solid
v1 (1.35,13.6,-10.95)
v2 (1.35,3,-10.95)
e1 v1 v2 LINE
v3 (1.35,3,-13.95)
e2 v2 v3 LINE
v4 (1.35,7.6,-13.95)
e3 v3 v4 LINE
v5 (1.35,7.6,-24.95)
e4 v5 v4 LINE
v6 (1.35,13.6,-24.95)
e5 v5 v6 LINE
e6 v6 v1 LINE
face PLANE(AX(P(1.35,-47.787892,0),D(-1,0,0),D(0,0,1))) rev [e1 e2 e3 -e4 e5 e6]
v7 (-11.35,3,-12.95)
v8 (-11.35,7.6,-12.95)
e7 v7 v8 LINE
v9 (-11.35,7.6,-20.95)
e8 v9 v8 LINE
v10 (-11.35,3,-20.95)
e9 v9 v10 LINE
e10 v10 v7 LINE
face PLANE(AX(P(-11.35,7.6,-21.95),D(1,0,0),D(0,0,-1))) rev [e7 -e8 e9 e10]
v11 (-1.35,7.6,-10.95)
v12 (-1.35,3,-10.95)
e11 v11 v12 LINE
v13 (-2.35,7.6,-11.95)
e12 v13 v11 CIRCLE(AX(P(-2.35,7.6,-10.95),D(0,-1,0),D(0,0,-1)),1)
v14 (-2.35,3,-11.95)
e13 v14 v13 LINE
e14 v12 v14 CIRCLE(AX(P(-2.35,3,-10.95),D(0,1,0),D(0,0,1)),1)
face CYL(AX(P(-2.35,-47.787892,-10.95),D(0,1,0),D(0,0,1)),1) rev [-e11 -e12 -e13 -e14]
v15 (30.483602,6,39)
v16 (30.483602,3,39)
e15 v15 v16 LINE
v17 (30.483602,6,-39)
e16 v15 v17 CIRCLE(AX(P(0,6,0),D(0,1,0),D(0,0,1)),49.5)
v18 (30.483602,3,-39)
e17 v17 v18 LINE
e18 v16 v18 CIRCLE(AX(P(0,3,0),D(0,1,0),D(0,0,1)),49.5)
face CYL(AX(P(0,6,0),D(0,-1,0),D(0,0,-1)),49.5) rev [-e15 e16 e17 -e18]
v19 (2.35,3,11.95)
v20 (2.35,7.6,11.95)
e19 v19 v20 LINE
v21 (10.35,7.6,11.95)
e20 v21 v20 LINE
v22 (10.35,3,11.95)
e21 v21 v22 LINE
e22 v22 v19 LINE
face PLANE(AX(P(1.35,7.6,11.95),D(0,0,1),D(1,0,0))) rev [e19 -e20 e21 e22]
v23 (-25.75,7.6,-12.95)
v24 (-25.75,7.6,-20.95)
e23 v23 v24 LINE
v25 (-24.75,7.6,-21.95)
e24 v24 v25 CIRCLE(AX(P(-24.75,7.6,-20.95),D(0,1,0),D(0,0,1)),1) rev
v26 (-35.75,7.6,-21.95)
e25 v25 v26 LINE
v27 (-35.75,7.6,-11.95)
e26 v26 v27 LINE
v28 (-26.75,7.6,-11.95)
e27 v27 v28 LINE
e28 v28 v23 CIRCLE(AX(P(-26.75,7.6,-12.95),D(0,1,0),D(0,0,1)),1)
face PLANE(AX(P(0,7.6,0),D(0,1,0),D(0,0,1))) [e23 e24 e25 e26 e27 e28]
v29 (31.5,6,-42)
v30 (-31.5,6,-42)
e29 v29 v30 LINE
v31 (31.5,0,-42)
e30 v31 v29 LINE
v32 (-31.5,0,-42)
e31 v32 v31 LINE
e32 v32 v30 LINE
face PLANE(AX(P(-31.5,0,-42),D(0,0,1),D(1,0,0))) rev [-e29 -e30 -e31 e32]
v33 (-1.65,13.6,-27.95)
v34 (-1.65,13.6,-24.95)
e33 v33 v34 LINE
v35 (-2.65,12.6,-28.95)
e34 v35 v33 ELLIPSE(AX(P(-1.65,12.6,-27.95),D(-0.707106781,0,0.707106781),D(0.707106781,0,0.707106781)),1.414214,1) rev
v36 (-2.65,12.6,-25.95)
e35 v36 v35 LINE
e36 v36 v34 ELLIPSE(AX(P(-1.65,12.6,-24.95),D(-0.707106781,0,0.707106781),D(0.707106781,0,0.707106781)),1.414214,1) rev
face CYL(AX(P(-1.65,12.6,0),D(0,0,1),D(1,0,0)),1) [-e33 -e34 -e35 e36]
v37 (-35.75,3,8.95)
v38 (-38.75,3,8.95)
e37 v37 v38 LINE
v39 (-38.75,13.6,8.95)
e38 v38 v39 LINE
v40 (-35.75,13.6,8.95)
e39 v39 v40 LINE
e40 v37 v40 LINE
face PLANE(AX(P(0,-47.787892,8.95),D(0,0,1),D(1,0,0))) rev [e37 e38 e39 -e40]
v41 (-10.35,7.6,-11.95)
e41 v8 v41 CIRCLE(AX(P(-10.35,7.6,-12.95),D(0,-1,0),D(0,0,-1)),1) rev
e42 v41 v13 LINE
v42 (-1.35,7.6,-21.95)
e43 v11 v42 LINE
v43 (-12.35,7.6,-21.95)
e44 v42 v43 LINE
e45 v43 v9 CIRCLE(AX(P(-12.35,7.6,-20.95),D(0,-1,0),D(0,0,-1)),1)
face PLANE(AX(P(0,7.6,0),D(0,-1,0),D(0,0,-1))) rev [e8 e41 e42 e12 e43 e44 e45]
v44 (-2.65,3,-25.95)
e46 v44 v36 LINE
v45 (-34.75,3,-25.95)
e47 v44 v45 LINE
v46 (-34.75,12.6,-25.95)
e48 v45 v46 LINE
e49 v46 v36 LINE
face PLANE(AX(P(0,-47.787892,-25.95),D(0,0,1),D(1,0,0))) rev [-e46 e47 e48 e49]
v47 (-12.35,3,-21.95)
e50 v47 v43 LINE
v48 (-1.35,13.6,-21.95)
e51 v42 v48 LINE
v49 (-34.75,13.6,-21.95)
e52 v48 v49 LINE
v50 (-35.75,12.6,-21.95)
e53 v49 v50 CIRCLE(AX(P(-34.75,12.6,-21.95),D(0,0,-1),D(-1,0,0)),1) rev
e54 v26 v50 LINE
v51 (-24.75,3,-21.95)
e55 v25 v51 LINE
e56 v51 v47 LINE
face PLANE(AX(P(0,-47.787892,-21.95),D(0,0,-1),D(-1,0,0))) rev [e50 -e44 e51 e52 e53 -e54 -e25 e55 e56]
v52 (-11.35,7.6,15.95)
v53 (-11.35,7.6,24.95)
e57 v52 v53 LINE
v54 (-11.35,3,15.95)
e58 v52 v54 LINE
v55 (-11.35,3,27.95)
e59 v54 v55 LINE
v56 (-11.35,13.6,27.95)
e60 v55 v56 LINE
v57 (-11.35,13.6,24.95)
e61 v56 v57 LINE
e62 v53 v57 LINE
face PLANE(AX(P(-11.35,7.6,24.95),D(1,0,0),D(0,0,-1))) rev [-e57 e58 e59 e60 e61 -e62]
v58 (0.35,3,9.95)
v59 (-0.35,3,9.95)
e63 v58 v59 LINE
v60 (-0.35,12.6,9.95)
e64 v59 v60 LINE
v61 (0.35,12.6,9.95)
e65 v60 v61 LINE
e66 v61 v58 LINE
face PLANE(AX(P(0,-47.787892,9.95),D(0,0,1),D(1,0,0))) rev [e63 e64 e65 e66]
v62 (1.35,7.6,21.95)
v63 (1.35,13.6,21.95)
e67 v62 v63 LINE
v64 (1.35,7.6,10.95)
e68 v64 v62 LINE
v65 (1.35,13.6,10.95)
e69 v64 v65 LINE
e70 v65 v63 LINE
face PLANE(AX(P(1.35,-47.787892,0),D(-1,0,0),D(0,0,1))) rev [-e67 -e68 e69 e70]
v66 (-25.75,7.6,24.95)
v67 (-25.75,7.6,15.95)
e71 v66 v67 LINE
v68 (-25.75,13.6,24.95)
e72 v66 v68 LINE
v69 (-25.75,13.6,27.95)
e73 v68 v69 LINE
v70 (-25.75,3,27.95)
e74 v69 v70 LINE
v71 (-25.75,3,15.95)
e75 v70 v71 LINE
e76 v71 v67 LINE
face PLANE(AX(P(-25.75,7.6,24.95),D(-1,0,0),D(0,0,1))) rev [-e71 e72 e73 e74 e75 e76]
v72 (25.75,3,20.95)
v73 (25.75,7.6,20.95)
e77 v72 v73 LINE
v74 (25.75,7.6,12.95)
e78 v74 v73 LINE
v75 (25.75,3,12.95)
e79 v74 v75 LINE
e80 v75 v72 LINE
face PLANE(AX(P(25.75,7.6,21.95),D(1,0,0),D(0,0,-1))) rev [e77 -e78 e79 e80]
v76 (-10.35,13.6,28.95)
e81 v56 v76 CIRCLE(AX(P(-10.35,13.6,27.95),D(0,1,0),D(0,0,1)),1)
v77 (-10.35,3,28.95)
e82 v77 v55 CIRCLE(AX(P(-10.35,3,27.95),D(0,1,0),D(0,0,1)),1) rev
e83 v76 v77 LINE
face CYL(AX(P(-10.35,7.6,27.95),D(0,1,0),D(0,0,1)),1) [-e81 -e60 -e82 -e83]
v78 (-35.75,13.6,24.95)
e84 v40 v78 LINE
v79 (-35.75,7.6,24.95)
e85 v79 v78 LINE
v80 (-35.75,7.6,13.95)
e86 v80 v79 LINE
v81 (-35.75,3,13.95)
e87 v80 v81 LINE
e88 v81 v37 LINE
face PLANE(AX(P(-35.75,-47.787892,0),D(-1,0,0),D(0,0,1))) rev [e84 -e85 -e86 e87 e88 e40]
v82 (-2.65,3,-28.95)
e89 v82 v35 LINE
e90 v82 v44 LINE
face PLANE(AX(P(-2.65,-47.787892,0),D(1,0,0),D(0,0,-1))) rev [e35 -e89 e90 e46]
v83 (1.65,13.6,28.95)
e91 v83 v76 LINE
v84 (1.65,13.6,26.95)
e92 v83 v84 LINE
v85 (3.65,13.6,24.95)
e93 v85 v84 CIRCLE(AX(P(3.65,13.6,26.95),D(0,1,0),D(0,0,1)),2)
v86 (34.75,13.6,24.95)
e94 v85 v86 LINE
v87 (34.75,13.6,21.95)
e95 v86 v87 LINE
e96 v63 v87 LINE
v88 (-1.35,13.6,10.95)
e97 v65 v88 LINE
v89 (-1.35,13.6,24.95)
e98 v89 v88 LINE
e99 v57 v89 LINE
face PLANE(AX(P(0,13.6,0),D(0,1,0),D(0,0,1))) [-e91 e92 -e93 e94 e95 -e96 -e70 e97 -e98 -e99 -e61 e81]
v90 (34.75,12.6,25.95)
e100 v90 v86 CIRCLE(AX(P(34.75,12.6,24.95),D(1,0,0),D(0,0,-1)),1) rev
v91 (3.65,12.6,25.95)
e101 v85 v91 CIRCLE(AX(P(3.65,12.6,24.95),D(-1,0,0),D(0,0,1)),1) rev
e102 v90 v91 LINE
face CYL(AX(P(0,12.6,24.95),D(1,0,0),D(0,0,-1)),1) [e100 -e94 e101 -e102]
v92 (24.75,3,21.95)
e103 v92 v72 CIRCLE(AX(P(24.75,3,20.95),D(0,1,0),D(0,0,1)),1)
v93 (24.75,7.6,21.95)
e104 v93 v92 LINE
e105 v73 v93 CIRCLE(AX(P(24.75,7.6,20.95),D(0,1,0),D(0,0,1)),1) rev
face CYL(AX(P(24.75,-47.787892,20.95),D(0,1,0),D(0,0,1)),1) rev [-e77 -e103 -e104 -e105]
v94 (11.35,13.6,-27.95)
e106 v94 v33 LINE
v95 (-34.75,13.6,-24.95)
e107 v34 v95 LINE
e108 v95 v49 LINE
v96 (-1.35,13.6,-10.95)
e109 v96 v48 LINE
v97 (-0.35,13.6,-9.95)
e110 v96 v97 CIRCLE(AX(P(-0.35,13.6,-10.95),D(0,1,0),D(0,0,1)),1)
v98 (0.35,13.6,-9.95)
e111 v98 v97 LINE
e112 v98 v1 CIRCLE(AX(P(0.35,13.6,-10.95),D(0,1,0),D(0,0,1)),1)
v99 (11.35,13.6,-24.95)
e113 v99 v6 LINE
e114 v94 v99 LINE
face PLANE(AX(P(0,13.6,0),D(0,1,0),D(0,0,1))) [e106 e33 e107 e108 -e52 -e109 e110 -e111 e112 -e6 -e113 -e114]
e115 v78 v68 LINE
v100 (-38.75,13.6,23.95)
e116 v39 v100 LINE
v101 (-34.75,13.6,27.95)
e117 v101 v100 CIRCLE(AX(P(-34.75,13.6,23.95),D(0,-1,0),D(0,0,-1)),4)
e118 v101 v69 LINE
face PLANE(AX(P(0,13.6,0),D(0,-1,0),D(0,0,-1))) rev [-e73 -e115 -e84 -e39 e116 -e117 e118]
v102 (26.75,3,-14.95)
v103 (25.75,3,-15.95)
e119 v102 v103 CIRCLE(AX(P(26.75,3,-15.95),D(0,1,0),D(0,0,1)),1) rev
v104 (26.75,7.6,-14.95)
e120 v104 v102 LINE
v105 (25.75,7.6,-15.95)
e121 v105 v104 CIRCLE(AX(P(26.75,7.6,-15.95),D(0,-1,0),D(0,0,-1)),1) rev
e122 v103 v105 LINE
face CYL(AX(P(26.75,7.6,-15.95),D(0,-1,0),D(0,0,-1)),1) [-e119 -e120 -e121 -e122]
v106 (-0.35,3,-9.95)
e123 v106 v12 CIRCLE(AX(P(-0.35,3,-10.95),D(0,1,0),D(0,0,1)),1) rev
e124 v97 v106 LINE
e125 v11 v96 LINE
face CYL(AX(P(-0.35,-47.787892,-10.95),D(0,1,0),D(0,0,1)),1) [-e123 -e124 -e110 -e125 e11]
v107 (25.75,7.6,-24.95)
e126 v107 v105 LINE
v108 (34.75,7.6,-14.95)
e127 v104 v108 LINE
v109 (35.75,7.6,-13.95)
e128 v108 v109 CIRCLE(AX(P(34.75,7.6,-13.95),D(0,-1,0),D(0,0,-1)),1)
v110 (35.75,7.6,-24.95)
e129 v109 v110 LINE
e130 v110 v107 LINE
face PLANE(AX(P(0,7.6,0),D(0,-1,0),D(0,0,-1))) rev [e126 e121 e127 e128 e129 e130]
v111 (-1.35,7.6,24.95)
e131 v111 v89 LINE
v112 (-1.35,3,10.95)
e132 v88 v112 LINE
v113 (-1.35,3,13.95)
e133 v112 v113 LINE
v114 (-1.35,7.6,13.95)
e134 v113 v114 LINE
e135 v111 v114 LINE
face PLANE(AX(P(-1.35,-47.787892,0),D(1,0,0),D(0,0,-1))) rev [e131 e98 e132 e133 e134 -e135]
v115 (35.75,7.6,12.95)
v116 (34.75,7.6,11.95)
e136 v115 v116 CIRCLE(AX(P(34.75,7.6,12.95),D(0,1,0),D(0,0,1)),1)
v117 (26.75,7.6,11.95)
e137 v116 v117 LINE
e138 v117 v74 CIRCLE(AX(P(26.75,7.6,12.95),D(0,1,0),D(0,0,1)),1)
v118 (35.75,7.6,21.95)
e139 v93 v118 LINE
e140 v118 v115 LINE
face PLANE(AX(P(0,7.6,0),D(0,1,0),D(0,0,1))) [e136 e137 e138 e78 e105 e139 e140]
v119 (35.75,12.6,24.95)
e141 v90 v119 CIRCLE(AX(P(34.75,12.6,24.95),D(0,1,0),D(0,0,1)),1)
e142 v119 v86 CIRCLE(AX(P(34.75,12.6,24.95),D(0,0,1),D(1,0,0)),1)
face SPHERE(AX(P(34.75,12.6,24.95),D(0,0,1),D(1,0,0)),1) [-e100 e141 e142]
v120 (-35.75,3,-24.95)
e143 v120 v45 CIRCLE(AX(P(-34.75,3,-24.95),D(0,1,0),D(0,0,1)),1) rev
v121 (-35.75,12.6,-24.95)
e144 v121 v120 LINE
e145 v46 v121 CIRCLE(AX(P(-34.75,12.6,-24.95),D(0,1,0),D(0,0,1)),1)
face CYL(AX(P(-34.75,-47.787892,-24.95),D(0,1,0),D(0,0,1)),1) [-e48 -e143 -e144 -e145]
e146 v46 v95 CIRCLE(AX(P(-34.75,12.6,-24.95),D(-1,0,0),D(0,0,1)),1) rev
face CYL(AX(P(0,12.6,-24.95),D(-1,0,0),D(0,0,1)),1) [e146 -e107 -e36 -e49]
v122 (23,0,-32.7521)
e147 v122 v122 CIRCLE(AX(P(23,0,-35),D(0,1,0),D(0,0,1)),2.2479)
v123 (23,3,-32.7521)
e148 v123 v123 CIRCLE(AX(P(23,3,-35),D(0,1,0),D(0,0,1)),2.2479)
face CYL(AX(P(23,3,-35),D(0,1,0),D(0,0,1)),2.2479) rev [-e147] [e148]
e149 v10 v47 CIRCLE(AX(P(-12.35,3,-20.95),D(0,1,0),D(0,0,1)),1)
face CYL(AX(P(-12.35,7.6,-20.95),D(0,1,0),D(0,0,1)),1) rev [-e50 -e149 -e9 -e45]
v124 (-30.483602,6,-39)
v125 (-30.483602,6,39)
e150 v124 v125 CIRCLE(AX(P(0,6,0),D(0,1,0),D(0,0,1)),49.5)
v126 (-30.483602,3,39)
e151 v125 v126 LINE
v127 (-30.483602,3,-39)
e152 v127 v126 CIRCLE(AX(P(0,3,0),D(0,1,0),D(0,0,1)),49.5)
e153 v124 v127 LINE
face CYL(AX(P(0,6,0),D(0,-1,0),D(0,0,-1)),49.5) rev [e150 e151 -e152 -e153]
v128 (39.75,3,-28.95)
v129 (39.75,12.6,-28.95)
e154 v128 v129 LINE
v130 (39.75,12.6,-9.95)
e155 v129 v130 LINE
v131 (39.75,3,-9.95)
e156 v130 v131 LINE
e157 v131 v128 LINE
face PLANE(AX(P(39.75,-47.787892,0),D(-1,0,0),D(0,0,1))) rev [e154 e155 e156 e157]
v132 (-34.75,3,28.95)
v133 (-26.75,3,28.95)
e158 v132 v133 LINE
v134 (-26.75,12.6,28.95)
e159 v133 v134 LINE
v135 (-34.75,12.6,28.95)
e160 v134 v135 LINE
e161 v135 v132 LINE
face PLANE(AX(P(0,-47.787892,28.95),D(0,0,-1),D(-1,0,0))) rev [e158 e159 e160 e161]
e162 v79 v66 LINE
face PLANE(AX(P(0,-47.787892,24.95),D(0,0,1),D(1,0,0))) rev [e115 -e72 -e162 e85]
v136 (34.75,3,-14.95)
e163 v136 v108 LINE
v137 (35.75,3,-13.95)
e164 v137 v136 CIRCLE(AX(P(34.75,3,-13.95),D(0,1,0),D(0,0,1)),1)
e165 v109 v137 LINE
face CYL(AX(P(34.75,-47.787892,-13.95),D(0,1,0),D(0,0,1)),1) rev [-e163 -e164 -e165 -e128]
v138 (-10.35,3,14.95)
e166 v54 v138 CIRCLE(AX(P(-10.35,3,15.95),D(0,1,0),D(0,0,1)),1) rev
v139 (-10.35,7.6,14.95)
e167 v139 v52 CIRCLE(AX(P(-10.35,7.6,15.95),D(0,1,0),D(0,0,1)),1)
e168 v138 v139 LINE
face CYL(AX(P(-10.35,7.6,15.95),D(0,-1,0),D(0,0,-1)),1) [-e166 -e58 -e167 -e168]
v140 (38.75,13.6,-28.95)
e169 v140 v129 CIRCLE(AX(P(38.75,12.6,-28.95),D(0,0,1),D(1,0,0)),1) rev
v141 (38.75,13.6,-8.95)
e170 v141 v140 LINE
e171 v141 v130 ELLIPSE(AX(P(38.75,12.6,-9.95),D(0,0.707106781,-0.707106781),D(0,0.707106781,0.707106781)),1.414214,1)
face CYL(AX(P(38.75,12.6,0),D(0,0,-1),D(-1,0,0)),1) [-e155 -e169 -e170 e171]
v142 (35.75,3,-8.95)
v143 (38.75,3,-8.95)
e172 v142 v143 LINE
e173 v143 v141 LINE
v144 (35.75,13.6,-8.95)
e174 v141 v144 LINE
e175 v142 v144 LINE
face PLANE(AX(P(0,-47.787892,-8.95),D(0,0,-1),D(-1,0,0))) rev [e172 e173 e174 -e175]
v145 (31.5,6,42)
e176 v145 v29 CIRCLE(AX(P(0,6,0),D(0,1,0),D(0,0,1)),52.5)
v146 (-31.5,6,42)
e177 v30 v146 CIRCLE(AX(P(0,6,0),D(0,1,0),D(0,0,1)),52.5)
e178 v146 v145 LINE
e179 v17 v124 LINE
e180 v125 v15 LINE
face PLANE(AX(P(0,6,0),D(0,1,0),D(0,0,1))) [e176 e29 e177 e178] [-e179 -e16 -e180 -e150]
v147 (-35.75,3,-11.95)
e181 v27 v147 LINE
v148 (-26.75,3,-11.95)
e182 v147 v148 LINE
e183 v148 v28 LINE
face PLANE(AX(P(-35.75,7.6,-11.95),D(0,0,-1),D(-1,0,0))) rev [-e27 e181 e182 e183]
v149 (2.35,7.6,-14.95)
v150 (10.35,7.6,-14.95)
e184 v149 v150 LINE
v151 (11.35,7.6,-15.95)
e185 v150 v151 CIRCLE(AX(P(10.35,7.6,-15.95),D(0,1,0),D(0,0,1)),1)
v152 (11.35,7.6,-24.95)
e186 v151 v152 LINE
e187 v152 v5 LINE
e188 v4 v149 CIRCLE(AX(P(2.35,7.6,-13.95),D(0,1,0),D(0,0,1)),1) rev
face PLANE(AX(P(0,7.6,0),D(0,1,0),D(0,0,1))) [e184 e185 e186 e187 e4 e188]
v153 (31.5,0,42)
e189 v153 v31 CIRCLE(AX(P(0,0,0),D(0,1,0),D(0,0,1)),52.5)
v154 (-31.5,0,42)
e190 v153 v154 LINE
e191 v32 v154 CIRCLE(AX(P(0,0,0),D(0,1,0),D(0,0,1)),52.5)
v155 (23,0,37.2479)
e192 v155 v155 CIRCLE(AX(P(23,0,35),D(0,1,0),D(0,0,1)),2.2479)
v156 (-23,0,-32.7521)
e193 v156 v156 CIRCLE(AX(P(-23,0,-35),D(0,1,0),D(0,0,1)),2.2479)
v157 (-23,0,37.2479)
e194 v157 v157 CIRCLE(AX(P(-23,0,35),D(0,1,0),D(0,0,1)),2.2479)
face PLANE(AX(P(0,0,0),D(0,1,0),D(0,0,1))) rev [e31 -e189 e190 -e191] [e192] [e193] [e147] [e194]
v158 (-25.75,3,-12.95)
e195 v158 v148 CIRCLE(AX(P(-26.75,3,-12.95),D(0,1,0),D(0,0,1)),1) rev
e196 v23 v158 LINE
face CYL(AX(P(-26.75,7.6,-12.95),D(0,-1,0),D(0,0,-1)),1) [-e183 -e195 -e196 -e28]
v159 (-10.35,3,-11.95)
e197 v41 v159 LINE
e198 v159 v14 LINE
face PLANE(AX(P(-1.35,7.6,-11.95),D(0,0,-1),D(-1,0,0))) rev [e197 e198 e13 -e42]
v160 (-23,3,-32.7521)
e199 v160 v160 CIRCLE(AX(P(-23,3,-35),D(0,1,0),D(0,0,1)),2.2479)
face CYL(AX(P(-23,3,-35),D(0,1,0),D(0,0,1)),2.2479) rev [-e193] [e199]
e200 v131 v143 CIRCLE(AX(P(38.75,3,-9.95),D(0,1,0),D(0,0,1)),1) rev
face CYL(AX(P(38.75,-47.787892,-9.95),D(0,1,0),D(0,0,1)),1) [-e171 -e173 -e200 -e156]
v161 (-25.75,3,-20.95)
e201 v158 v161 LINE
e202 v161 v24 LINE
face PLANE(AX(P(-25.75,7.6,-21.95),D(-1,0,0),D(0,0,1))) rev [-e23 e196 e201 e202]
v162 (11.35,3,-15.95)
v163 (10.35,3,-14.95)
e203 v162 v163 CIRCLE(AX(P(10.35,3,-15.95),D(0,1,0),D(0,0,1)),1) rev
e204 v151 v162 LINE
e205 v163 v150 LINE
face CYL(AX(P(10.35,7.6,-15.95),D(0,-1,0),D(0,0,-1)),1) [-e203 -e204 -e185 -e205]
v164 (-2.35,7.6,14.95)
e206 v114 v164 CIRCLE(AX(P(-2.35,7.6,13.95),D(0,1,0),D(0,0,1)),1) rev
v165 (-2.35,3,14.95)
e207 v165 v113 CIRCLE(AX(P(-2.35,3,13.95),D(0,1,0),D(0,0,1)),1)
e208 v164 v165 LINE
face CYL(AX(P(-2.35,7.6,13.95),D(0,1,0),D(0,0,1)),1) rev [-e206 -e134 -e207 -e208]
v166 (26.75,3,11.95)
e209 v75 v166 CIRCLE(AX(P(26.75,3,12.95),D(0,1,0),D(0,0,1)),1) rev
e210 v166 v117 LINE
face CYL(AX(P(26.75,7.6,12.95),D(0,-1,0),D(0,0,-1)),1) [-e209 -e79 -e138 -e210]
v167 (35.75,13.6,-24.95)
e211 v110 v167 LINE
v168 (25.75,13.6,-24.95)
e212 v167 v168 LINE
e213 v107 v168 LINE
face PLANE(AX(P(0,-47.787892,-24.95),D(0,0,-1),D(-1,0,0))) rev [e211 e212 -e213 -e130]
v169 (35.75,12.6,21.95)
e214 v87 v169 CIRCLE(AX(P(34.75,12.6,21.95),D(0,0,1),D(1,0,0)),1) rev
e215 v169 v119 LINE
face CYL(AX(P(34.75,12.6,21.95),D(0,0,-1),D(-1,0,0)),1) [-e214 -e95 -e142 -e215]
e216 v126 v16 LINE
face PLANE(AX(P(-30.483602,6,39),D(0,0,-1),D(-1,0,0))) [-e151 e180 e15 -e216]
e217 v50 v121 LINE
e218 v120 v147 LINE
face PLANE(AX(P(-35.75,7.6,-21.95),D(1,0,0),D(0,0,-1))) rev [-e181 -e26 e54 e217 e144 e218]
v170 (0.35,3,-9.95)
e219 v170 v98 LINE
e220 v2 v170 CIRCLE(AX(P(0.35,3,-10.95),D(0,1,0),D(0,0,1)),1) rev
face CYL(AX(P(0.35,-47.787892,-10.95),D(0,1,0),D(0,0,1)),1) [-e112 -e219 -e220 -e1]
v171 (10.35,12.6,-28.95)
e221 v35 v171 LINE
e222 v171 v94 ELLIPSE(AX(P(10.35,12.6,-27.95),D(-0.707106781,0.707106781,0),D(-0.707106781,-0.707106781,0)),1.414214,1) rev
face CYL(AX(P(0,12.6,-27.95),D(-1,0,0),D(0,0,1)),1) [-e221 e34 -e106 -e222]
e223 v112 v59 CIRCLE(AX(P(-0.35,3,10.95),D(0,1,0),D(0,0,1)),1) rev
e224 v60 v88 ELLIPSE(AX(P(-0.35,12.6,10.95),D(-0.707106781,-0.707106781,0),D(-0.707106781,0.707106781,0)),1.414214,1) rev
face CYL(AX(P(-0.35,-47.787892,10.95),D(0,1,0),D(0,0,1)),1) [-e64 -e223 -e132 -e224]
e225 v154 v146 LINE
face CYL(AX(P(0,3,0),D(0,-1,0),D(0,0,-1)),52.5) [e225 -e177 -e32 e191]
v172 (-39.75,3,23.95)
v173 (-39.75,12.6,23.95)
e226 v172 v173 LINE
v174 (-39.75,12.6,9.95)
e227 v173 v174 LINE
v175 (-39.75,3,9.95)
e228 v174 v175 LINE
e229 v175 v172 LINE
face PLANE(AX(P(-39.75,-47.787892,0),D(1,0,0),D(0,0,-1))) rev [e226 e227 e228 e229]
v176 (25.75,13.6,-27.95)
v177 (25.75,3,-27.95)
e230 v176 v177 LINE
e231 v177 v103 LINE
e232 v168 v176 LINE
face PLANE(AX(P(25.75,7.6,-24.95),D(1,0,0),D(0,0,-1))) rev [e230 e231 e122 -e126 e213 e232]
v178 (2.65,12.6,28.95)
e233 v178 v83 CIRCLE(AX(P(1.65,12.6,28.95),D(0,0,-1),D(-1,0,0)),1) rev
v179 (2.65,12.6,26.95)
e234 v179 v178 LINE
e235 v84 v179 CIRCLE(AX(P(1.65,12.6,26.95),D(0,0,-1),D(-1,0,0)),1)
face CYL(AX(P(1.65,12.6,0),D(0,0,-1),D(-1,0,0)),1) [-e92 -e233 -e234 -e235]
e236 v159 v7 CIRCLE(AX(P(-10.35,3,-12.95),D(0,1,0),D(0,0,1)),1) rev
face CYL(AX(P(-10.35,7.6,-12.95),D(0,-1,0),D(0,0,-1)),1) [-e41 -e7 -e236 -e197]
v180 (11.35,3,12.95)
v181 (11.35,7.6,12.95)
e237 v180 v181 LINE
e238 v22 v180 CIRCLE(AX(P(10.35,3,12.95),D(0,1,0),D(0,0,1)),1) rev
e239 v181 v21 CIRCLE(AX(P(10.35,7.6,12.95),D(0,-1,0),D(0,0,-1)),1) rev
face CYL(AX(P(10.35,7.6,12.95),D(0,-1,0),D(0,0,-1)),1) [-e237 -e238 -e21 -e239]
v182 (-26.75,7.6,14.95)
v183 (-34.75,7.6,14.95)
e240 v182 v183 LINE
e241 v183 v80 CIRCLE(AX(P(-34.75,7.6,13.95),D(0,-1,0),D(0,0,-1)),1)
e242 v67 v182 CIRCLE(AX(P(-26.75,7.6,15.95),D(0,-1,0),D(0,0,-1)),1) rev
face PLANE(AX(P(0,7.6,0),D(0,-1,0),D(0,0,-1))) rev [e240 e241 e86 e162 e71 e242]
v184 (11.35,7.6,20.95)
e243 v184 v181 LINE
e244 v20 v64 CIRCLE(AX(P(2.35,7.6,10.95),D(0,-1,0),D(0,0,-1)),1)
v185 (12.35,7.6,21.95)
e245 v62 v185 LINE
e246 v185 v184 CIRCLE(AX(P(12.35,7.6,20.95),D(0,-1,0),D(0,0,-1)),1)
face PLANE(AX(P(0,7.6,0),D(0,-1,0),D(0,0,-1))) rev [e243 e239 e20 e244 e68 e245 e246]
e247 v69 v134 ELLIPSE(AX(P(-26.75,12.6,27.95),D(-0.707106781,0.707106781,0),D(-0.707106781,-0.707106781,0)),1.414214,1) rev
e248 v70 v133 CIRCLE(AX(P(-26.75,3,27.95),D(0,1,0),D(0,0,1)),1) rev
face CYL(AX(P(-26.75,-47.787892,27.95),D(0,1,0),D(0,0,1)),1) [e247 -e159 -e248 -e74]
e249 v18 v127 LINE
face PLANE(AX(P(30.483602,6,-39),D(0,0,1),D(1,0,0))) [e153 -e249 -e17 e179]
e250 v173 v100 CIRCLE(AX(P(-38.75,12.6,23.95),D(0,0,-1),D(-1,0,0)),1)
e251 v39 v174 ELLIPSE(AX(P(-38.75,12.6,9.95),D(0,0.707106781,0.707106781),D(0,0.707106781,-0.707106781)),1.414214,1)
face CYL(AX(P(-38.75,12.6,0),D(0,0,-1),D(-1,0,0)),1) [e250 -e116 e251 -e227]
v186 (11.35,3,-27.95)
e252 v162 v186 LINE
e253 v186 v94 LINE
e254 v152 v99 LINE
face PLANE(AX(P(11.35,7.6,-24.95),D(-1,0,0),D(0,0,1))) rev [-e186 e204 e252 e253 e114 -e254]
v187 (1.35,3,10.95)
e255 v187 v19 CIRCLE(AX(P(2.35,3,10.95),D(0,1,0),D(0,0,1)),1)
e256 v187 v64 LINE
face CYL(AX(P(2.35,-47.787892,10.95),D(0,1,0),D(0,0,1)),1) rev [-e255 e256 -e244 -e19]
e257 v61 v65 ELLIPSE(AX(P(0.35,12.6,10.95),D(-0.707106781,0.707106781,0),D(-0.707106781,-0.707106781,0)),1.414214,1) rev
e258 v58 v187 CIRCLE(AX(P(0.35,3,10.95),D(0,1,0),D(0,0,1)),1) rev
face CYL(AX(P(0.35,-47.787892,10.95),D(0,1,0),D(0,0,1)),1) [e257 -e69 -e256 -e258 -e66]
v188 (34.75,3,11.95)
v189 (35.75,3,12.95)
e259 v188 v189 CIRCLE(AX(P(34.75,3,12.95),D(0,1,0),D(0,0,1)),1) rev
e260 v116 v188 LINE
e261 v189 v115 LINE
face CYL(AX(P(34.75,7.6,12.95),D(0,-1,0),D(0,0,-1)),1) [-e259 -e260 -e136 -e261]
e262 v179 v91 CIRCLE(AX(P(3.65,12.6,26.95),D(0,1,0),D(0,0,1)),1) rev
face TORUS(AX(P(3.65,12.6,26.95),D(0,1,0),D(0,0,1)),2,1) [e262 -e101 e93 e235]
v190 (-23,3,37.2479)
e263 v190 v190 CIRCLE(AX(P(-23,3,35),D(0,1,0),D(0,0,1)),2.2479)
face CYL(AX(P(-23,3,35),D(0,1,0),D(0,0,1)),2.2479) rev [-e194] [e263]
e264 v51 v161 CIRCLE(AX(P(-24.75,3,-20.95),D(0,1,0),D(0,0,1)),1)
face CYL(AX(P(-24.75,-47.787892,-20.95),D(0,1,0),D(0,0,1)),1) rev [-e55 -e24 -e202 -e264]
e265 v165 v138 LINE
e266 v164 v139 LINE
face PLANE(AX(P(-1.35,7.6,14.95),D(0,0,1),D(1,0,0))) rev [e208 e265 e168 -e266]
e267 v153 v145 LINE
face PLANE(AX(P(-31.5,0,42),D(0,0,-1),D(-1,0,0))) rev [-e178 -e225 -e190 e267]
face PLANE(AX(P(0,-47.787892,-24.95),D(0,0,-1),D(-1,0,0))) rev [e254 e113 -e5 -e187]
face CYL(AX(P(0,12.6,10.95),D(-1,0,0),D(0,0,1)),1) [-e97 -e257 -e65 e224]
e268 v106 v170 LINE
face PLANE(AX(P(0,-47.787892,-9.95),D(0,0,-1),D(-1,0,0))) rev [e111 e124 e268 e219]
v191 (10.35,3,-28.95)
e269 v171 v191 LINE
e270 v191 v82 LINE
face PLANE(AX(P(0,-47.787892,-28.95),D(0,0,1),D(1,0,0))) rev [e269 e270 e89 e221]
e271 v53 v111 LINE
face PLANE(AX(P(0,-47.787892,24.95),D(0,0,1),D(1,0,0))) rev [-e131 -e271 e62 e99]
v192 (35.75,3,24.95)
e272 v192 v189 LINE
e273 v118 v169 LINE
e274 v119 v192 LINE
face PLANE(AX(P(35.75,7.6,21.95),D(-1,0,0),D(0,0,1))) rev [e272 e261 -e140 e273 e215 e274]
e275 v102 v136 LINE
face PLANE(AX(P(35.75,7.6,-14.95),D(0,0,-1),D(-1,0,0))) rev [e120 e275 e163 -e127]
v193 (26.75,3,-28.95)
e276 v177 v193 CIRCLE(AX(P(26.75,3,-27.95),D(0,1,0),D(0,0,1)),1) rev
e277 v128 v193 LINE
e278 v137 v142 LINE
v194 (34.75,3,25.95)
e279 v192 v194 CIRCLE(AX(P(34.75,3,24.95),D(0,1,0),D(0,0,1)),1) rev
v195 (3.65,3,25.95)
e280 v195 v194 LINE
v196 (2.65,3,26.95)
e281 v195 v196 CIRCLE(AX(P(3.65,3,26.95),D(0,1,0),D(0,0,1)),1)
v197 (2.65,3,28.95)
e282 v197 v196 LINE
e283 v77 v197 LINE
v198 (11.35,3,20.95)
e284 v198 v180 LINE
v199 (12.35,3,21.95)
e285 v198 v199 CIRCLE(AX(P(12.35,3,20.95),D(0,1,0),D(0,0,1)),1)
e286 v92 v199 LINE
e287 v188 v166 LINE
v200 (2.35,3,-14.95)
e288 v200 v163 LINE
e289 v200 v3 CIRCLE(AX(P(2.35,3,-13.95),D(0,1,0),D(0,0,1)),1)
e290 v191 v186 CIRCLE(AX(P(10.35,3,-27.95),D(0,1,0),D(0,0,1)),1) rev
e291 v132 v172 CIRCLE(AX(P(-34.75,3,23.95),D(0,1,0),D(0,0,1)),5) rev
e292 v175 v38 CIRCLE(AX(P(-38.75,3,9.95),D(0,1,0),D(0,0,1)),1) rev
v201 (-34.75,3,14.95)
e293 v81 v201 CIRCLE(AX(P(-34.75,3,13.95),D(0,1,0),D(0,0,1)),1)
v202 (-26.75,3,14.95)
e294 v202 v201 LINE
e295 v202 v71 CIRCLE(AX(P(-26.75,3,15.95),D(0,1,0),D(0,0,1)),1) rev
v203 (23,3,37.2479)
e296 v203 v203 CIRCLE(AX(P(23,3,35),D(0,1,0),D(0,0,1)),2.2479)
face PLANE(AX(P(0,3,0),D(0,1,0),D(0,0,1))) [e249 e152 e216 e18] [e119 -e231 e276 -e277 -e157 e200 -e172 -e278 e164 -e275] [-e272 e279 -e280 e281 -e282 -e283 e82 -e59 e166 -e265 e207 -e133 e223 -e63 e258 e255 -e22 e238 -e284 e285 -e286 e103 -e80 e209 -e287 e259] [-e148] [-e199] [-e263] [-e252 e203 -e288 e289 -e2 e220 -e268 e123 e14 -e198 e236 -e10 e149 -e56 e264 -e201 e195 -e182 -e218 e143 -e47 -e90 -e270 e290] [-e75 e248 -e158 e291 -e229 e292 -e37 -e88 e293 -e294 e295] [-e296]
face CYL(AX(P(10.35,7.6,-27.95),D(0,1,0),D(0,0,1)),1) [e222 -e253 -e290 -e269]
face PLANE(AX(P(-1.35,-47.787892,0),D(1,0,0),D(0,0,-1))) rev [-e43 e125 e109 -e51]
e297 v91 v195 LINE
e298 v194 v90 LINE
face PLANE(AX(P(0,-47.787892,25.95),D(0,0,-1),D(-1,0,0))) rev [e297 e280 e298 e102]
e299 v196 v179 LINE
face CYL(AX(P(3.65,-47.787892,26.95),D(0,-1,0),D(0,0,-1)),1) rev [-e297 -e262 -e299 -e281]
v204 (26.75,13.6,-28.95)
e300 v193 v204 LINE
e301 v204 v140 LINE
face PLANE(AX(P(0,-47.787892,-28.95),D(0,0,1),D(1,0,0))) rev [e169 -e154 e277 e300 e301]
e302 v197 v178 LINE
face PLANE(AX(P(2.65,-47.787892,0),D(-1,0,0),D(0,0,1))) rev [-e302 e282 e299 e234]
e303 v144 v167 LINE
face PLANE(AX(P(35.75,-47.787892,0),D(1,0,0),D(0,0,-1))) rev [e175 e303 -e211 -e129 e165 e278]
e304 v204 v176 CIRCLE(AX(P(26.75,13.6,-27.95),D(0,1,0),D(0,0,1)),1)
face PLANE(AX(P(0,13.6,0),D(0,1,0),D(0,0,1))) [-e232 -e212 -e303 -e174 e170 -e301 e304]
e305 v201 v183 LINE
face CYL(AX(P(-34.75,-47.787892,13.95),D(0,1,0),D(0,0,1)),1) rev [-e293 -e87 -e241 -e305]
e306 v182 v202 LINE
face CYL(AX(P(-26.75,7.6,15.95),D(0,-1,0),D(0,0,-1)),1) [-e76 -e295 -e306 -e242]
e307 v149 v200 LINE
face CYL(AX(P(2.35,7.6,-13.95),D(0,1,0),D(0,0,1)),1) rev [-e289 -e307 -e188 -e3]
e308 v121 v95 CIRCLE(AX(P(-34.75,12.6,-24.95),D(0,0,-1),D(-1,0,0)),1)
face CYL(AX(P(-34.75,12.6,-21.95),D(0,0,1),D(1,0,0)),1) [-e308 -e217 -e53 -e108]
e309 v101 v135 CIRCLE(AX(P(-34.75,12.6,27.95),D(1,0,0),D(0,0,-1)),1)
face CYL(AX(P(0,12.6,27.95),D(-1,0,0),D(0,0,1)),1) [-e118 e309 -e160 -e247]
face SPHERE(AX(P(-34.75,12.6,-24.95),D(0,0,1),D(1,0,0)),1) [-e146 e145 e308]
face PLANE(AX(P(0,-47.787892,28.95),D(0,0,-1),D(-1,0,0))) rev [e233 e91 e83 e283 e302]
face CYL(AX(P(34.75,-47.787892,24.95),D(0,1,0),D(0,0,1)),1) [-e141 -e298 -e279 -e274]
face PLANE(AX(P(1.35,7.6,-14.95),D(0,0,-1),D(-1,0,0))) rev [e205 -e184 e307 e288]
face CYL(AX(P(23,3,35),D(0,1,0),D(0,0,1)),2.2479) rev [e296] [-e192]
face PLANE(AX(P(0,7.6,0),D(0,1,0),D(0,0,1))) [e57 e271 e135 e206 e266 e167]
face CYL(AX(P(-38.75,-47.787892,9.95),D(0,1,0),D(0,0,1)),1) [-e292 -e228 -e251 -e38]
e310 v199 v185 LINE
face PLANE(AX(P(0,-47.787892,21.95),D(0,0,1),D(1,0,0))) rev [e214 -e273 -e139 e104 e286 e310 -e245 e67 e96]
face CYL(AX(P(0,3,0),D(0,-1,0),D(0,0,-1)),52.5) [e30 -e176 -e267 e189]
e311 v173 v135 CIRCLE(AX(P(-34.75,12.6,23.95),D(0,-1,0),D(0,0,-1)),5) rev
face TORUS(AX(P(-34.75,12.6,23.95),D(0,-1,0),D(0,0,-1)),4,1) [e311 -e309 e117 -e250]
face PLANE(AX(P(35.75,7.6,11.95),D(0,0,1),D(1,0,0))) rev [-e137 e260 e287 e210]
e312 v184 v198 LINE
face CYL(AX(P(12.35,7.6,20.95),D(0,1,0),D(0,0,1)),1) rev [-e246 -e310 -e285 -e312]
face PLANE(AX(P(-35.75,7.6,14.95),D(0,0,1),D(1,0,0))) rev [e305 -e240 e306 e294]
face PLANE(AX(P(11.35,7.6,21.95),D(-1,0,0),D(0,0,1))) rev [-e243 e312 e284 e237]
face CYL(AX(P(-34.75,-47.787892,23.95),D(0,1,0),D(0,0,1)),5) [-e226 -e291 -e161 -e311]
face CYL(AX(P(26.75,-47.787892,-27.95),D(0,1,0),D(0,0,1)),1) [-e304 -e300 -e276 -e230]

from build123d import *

# Parameters (mm, degrees)
A_BASE_T42_OUTLINE_R       = 2.2479
A_BASE_T42_OUTLINE_R_2     = 1
A_BASE_T42_DEPTH           = 3
OUTER_BRIM_DEPTH           = 3
SKETCH5_W                  = 15
SKETCH5_H                  = 3
BASE_SUPPORTS_DEPTH        = 3
BASE_SUPPORTS_CHAMFER_SIZE = 3
COVER_START                = -3
SKETCH6_R                  = 1
COVER_DEPTH                = 3
SKETCH9_W                  = 15
SKETCH9_H                  = 6
CUT_EXTRUDE1_DEPTH         = 10
SKETCH11_W                 = 10
SKETCH11_H                 = 10
BOSS_EXTRUDE1_DEPTH        = 4.6
BOSS_EXTRUDE2_DEPTH        = 10.6
FILLET1_R                  = 1
FILLET2_R                  = 5


# Read off the part's stored shape, not the designer's step: a_base_t42
# Some blends are built 0.0001 mm under size
with BuildPart() as part:
    # a_base_t42 outline → a_base_t42 (new body)
    with BuildSketch(Plane(origin=(0, 0, 0), x_dir=(1, 0, 0), z_dir=(0, 1, 0))):
        with BuildLine():
            ThreePointArc((31.5, -42), (52.5, 0), (31.5, 42))
            Line((31.5, 42), (-31.5, 42))
            ThreePointArc((-31.5, 42), (-52.5, 0), (-31.5, -42))
            Line((-31.5, -42), (31.5, -42))
        make_face()
        with Locations((-23, -35)):
            Circle(A_BASE_T42_OUTLINE_R, mode=Mode.SUBTRACT)
        with Locations((23, -35)):
            Circle(A_BASE_T42_OUTLINE_R, mode=Mode.SUBTRACT)
        with Locations((-40.25, 0)):
            Circle(A_BASE_T42_OUTLINE_R_2, mode=Mode.SUBTRACT)
        with Locations((-23, 35)):
            Circle(A_BASE_T42_OUTLINE_R, mode=Mode.SUBTRACT)
        with Locations((40.25, 0)):
            Circle(A_BASE_T42_OUTLINE_R_2, mode=Mode.SUBTRACT)
        with Locations((23, 35)):
            Circle(A_BASE_T42_OUTLINE_R, mode=Mode.SUBTRACT)
    extrude(amount=A_BASE_T42_DEPTH)

    # Sketch1 → Outer Brim (add)
    with BuildSketch(Plane(origin=(0, 3, 0), x_dir=(1, 0, 0), z_dir=(0, 1, 0))):
        with BuildLine():
            Line((-31.5, -42), (31.5, -42))
            ThreePointArc((31.5, -42), (52.5, 0), (31.5, 42))
            Line((31.5, 42), (-31.5, 42))
            ThreePointArc((-31.5, 42), (-52.5, 0), (-31.5, -42))
        make_face()
        with BuildLine():
            Line((30.483602149, 39), (-30.483602149, 39))
            ThreePointArc((-30.483602149, 39), (-49.5, 0), (-30.483602149, -39))
            Line((-30.483602149, -39), (30.483602149, -39))
            ThreePointArc((30.483602149, -39), (49.5, 0), (30.483602149, 39))
        make_face(mode=Mode.SUBTRACT)
    extrude(amount=OUTER_BRIM_DEPTH)

    # Sketch5 → Base Supports (add)
    with BuildSketch(Plane(origin=(0, 3, 0), x_dir=(1, 0, 0), z_dir=(0, 1, 0))):
        with Locations((0, -27)):
            Rectangle(SKETCH5_W, SKETCH5_H)
        with Locations((0, 27)):
            Rectangle(SKETCH5_W, SKETCH5_H)
    extrude(amount=BASE_SUPPORTS_DEPTH)

    # Base Supports Chamfer
    base_supports_chamfer_edges = [part.edges().sort_by_distance(p)[0] for p in [
        (0, 3, 28.5),
        (0, 3, -28.5),
    ]]
    chamfer(base_supports_chamfer_edges, length=BASE_SUPPORTS_CHAMFER_SIZE - 0.0001)  # a hair under: the kernel refuses the full size

    # Sketch6 → Cover (add)
    with BuildSketch(Plane(origin=(0, 3, 0), x_dir=(1, 0, 0), z_dir=(0, 1, 0)).offset(COVER_START)):
        with Locations((-40.25, 0)):
            Circle(SKETCH6_R)
        with Locations((40.25, 0)):
            Circle(SKETCH6_R)
    extrude(amount=COVER_DEPTH)

    # Sketch9 → Cut-Extrude1 (cut)
    with BuildSketch(Plane(origin=(0, 3, 0), x_dir=(1, 0, 0), z_dir=(0, 1, 0))):
        with Locations((0, 28.5)):
            Rectangle(SKETCH9_W, SKETCH9_H)
        with Locations((0, -28.5)):
            Rectangle(SKETCH9_W, SKETCH9_H)
    extrude(amount=CUT_EXTRUDE1_DEPTH, mode=Mode.SUBTRACT)

    # Sketch11 → Boss-Extrude1 (add)
    with BuildSketch(Plane(origin=(5.553919153, 3, -19.484186112), x_dir=(-1, 0, 0), z_dir=(0, 1, 0))):
        with Locations((11.903919153, 39.434186112)):
            Rectangle(SKETCH11_W, SKETCH11_H)
        with Locations((36.303919153, 39.434186112)):
            Rectangle(SKETCH11_W, SKETCH11_H)
        with Locations((36.303919153, 2.534186112)):
            Rectangle(SKETCH11_W, SKETCH11_H)
        with Locations((11.903919153, 2.534186112)):
            Rectangle(SKETCH11_W, SKETCH11_H)
        with Locations((-0.796080847, -0.465813888)):
            Rectangle(SKETCH11_W, SKETCH11_H)
        with Locations((-0.796080847, 36.434186112)):
            Rectangle(SKETCH11_W, SKETCH11_H)
        with Locations((-25.196080847, 36.434186112)):
            Rectangle(SKETCH11_W, SKETCH11_H)
        with Locations((-25.196080847, -0.465813888)):
            Rectangle(SKETCH11_W, SKETCH11_H)
    extrude(amount=BOSS_EXTRUDE1_DEPTH)

    # Sketch13 → Boss-Extrude2 (add)
    with BuildSketch(Plane(origin=(5.553919153, 3, -19.484186112), x_dir=(-1, 0, 0), z_dir=(0, 1, 0))):
        Polygon((2.903919153, 48.434186112), (2.903919153, 45.434186112), (-30.196080847, 45.434186112), (-30.196080847, 41.434186112), (4.203919153, 41.434186112), (4.203919153, 29.434186112), (6.903919153, 29.434186112), (6.903919153, 44.434186112), (16.903919153, 44.434186112), (16.903919153, 48.434186112), align=None)
        Polygon((41.303919153, -2.465813888), (41.303919153, -6.465813888), (8.203919153, -6.465813888), (8.203919153, -9.465813888), (-5.796080847, -9.465813888), (-5.796080847, -5.465813888), (4.203919153, -5.465813888), (4.203919153, 9.534186112), (6.903919153, 9.534186112), (6.903919153, -2.465813888), align=None)
        Polygon((41.303919153, 44.434186112), (41.303919153, 28.434186112), (45.303919153, 28.434186112), (45.303919153, 48.434186112), (31.303919153, 48.434186112), (31.303919153, 44.434186112), align=None)
        Polygon((-34.196080847, -9.465813888), (-34.196080847, 10.534186112), (-30.196080847, 10.534186112), (-30.196080847, -5.465813888), (-20.196080847, -5.465813888), (-20.196080847, -9.465813888), align=None)
    extrude(amount=BOSS_EXTRUDE2_DEPTH)

    # Fillet1
    fillet1_edges = [part.edges().sort_by_distance(p)[0] for p in [
        (11.35, 5.3, 11.95),
        (25.75, 5.3, 11.95),
        (11.35, 5.3, -14.95),
        (25.75, 5.3, -14.95),
        (0, 13.6, 9.95),
        (-25.75, 5.3, 14.95),
        (-11.35, 5.3, 14.95),
        (-11.35, 5.3, -11.95),
        (-25.75, 5.3, -11.95),
        (-35.75, 5.3, 14.95),
        (1.35, 8.3, -9.95),
        (-1.35, 8.3, -9.95),
        (-1.35, 5.3, -11.95),
        (-11.35, 5.3, -21.95),
        (-25.75, 5.3, -21.95),
        (19.2, 13.6, 25.95),
        (39.75, 13.6, -18.95),
        (4.35, 13.6, -28.95),
        (-2.65, 13.6, -27.45),
        (-19.2, 13.6, -25.95),
        (-35.75, 13.6, -23.95),
        (35.75, 13.6, 23.95),
        (39.75, 8.3, -8.95),
        (11.35, 5.3, 21.95),
        (25.75, 5.3, 21.95),
        (35.75, 5.3, -14.95),
        (1.35, 5.3, 11.95),
        (1.35, 5.3, -14.95),
        (-1.35, 5.3, 14.95),
        (-1.35, 8.3, 9.95),
        (1.35, 8.3, 9.95),
        (35.75, 5.3, 11.95),
        (35.75, 8.3, 25.95),
        (2.65, 13.6, 27.45),
        (2.65, 8.3, 25.95),
        (-32.75, 13.6, 28.95),
        (-39.75, 13.6, 18.95),
        (-39.75, 8.3, 8.95),
        (-35.75, 8.3, -25.95),
        (25.75, 8.3, -28.95),
        (11.35, 8.3, -28.95),
        (-11.35, 8.3, 28.95),
        (-25.75, 8.3, 28.95),
    ]]
    fillet(fillet1_edges, radius=FILLET1_R - 0.0001)  # a hair under: the kernel refuses the full size

    # Fillet2
    # the kernel refuses this fillet: 5 mm, written as the material it takes off along each edge
    with BuildSketch(Plane(origin=(-34.75, 13.6, 23.95), x_dir=(-1, 0, 0), z_dir=(0, 0, -1))) as fillet2_piece_1:
        with BuildLine():
            CenterArc((4.0001, -0.9999), 0.9999, 0, 90)
            Line((5, -0.9999), (5, 0))
            Line((5, 0), (4.0001, 0))
        make_face()
    revolve(axis=Axis((-34.75, 13.6, 23.95), (0, 1, 0)), revolution_arc=90, mode=Mode.SUBTRACT)
    with BuildSketch(Plane(origin=(-39.75, 3, 28.95), x_dir=(0, 0, -1), z_dir=(0, 1, 0))) as fillet2_piece_2:
        with BuildLine():
            CenterArc((FILLET2_R, -FILLET2_R), FILLET2_R, 90, 90)
            Line((0, -FILLET2_R), (0, 0))
            Line((0, 0), (FILLET2_R, 0))
        make_face()
    extrude(amount=10.6, mode=Mode.SUBTRACT)


solid = part.part
